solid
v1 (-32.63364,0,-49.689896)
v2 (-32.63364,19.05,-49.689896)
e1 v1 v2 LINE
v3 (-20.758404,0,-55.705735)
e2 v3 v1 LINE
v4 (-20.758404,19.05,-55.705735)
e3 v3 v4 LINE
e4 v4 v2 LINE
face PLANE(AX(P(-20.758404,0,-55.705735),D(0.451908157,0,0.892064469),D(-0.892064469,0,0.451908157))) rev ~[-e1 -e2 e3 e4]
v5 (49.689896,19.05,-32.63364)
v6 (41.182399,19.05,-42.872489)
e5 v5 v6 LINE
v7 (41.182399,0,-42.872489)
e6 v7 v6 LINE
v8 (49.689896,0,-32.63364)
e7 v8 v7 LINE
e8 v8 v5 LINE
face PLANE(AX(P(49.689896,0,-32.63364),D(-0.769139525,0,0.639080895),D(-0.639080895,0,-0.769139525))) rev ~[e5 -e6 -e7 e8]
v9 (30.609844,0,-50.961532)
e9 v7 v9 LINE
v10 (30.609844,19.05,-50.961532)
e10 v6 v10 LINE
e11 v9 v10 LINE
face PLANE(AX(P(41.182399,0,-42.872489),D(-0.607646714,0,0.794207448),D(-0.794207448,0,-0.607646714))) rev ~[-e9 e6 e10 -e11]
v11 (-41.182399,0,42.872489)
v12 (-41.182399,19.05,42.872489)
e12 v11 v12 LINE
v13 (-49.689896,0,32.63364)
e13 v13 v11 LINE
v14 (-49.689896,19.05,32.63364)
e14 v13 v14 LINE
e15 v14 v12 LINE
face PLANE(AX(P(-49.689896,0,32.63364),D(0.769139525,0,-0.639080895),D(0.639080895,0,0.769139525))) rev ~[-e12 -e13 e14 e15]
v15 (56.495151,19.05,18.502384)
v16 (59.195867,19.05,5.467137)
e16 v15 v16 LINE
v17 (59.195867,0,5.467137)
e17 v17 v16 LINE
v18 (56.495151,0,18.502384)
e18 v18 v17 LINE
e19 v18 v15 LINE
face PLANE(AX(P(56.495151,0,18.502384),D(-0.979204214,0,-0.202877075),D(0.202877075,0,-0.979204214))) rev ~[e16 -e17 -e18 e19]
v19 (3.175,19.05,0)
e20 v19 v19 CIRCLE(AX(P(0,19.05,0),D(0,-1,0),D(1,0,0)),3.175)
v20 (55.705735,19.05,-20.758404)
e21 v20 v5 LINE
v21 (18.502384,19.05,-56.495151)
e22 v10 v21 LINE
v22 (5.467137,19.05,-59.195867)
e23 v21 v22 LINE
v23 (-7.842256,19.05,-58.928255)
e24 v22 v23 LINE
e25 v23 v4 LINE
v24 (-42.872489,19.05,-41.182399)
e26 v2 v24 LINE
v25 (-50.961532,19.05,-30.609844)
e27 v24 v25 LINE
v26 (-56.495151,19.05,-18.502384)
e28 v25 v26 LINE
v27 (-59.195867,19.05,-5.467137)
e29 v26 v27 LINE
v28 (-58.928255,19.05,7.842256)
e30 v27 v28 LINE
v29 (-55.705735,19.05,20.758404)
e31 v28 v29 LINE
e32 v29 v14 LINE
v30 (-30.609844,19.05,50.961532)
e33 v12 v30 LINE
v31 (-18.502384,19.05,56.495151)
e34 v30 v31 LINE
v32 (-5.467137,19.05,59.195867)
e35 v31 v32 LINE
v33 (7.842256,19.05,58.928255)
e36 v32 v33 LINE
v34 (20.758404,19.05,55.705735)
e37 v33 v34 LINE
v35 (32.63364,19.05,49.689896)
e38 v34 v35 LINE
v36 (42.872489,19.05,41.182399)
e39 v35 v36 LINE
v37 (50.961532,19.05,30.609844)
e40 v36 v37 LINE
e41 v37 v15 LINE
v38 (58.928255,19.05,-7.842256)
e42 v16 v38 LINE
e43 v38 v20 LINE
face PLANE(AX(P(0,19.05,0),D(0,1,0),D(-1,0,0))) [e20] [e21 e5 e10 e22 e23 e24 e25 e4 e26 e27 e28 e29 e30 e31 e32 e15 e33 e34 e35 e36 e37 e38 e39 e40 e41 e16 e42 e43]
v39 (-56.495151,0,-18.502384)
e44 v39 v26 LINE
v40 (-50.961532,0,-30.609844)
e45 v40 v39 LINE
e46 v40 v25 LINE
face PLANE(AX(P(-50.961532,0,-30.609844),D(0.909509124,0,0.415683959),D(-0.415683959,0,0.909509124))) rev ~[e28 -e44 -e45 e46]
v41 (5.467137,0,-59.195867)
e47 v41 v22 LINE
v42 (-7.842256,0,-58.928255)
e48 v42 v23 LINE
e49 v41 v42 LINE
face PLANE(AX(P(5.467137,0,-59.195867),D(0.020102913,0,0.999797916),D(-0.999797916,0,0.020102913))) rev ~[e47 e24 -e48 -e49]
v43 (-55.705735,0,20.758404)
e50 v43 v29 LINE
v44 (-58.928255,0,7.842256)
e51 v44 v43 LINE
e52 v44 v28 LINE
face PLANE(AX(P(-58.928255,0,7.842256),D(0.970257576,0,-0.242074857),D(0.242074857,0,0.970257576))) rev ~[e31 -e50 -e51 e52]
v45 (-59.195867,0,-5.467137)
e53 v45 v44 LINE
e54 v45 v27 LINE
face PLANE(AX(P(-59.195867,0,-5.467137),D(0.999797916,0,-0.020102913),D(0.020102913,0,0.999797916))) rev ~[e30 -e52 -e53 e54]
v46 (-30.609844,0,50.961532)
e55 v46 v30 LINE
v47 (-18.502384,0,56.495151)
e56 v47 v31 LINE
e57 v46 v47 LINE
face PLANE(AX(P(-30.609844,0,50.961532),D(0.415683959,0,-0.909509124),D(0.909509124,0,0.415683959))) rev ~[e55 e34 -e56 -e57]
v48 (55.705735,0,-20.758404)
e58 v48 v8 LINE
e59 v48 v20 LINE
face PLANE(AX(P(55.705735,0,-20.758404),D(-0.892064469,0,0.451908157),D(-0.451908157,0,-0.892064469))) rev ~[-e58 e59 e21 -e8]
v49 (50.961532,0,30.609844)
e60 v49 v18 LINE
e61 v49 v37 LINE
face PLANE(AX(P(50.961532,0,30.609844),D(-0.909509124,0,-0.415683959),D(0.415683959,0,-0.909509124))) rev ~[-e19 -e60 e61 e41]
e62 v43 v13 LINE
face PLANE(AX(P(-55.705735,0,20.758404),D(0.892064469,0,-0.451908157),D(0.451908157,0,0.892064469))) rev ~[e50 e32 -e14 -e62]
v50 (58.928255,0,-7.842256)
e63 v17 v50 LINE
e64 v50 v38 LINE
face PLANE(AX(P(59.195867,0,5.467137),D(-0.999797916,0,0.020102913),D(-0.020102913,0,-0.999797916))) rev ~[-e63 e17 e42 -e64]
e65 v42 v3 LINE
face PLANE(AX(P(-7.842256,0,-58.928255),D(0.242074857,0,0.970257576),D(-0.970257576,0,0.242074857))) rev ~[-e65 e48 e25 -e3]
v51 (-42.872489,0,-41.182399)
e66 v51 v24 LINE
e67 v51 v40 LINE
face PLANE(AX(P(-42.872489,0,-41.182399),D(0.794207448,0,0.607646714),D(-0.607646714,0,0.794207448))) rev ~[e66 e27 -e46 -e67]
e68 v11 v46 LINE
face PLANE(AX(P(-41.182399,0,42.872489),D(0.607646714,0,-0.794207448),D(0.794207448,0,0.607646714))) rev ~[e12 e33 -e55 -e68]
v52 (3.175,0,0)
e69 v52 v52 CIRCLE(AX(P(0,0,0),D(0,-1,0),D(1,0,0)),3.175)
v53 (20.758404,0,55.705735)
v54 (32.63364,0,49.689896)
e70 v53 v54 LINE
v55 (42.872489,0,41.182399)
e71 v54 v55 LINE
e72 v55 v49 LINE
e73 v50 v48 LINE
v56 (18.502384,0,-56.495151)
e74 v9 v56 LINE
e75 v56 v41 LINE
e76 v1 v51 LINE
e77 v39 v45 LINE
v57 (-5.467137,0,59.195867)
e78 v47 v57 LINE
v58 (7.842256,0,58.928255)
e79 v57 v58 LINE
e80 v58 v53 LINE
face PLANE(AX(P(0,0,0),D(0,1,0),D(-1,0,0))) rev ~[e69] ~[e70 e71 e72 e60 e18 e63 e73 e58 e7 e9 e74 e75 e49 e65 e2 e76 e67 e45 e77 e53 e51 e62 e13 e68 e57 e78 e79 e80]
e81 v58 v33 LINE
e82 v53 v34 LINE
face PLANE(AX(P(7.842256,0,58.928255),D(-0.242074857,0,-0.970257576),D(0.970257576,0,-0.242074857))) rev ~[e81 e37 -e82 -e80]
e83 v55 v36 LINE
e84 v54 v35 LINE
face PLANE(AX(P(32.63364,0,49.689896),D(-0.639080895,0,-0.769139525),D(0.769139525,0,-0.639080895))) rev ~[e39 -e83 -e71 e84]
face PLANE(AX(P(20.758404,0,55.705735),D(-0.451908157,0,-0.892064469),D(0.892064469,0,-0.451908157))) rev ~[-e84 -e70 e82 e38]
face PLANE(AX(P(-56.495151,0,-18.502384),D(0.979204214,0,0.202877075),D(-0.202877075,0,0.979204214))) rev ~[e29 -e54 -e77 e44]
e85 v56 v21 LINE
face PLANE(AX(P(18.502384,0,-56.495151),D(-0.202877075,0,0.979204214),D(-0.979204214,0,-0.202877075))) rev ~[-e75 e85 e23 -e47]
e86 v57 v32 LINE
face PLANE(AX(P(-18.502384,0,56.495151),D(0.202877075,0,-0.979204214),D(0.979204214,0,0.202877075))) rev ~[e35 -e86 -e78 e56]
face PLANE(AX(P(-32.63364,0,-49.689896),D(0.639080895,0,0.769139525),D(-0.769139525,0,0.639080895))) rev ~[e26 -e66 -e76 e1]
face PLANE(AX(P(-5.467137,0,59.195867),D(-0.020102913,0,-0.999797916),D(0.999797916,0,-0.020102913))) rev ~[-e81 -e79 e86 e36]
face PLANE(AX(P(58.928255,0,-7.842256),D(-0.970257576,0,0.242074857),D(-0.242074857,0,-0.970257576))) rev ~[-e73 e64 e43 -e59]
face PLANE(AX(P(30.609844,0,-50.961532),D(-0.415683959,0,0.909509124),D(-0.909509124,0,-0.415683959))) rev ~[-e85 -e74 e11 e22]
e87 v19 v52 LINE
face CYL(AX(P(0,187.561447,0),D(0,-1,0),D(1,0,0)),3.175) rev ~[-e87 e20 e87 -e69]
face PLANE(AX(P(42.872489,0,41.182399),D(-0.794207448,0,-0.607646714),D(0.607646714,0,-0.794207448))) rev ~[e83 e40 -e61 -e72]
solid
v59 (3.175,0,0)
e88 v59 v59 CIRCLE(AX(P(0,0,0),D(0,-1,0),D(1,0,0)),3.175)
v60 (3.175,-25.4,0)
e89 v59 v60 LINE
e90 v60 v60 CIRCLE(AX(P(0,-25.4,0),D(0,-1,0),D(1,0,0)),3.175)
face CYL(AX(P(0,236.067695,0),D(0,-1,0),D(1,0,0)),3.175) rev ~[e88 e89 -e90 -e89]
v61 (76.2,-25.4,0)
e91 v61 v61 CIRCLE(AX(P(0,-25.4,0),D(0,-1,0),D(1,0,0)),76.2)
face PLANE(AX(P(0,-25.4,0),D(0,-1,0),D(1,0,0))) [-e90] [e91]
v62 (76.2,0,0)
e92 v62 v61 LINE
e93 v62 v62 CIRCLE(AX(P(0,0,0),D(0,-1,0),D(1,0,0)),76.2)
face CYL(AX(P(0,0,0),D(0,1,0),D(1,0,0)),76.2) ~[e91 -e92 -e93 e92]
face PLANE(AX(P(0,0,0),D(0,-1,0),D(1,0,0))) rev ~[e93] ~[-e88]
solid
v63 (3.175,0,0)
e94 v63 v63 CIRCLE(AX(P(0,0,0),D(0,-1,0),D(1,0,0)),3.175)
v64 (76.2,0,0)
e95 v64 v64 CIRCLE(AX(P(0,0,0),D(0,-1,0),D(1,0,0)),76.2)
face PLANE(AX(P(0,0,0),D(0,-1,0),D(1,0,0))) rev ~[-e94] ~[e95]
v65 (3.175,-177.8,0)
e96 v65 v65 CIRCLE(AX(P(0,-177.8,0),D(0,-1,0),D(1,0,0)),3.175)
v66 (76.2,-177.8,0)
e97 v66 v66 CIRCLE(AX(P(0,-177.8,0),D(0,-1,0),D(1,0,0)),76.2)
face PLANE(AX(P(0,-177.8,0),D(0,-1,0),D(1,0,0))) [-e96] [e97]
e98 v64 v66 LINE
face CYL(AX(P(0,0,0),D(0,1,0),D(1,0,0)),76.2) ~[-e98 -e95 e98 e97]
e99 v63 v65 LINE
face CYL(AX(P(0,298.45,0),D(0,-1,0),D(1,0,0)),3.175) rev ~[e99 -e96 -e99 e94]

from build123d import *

# Parameters (mm, degrees)
F0_R     = 76.2
F2_DEPTH = 177.8
F1_R     = 76.2
F3_DEPTH = 25.4
F5_DEPTH = 19.05
F9_D     = 6.35
F9_2_D   = 6.35
F9_3_D   = 6.35


# Not quite as in the source:
# - the program builds the solid bodies; features that only make, move or delete a surface that nothing else refers to are left out


with BuildPart() as f2:
    # F0 (on Front) → F2 (new body)
    with BuildSketch(Plane.XZ):
        Circle(F0_R)
    extrude(amount=F2_DEPTH)

    # F9 (through all)
    with Locations(Plane(origin=(0, 19.05, 0), x_dir=(-1, 0, 0), z_dir=(0, 1, 0))):
        with Locations((0, 0)):
            Hole(F9_D / 2)


with BuildPart() as f3:
    # F1 (on face) → F3 (new body)
    with BuildSketch(Plane.XZ):
        Circle(F1_R)
    extrude(amount=F3_DEPTH)

    # F9#2 (through all)
    with Locations(Plane(origin=(0, 19.05, 0), x_dir=(-1, 0, 0), z_dir=(0, 1, 0))):
        with Locations((0, 0)):
            Hole(F9_2_D / 2)


with BuildPart() as f5:
    # F4 (on face) → F5 (new body)
    with BuildSketch(Plane(origin=(0, 0, 0), x_dir=(-1, 0, 0), z_dir=(0, 1, 0))):
        Polygon((49.6898963324, 32.6336398575), (41.1823988684, 42.8724885133), (30.6098439624, 50.961531575), (18.5023836646, 56.4951506468), (5.4671365906, 59.1958669619), (-7.8422555409, 58.9282553272), (-20.7584042331, 55.7057349074), (-32.6336398575, 49.6898963324), (-42.8724885133, 41.1823988684), (-50.961531575, 30.6098439624), (-56.4951506468, 18.5023836646), (-59.1958669619, 5.4671365906), (-58.9282553272, -7.8422555409), (-55.7057349074, -20.7584042331), (-49.6898963324, -32.6336398575), (-41.1823988684, -42.8724885133), (-30.6098439624, -50.961531575), (-18.5023836646, -56.4951506468), (-5.4671365906, -59.1958669619), (7.8422555409, -58.9282553272), (20.7584042331, -55.7057349074), (32.6336398575, -49.6898963324), (42.8724885133, -41.1823988684), (50.961531575, -30.6098439624), (56.4951506468, -18.5023836646), (59.1958669619, -5.4671365906), (58.9282553272, 7.8422555409), (55.7057349074, 20.7584042331), align=None)
    extrude(amount=F5_DEPTH)

    # F9#3 (through all)
    with Locations(Plane(origin=(0, 19.05, 0), x_dir=(-1, 0, 0), z_dir=(0, 1, 0))):
        with Locations((0, 0)):
            Hole(F9_3_D / 2)


solid = Compound([f2.part, f3.part, f5.part])
